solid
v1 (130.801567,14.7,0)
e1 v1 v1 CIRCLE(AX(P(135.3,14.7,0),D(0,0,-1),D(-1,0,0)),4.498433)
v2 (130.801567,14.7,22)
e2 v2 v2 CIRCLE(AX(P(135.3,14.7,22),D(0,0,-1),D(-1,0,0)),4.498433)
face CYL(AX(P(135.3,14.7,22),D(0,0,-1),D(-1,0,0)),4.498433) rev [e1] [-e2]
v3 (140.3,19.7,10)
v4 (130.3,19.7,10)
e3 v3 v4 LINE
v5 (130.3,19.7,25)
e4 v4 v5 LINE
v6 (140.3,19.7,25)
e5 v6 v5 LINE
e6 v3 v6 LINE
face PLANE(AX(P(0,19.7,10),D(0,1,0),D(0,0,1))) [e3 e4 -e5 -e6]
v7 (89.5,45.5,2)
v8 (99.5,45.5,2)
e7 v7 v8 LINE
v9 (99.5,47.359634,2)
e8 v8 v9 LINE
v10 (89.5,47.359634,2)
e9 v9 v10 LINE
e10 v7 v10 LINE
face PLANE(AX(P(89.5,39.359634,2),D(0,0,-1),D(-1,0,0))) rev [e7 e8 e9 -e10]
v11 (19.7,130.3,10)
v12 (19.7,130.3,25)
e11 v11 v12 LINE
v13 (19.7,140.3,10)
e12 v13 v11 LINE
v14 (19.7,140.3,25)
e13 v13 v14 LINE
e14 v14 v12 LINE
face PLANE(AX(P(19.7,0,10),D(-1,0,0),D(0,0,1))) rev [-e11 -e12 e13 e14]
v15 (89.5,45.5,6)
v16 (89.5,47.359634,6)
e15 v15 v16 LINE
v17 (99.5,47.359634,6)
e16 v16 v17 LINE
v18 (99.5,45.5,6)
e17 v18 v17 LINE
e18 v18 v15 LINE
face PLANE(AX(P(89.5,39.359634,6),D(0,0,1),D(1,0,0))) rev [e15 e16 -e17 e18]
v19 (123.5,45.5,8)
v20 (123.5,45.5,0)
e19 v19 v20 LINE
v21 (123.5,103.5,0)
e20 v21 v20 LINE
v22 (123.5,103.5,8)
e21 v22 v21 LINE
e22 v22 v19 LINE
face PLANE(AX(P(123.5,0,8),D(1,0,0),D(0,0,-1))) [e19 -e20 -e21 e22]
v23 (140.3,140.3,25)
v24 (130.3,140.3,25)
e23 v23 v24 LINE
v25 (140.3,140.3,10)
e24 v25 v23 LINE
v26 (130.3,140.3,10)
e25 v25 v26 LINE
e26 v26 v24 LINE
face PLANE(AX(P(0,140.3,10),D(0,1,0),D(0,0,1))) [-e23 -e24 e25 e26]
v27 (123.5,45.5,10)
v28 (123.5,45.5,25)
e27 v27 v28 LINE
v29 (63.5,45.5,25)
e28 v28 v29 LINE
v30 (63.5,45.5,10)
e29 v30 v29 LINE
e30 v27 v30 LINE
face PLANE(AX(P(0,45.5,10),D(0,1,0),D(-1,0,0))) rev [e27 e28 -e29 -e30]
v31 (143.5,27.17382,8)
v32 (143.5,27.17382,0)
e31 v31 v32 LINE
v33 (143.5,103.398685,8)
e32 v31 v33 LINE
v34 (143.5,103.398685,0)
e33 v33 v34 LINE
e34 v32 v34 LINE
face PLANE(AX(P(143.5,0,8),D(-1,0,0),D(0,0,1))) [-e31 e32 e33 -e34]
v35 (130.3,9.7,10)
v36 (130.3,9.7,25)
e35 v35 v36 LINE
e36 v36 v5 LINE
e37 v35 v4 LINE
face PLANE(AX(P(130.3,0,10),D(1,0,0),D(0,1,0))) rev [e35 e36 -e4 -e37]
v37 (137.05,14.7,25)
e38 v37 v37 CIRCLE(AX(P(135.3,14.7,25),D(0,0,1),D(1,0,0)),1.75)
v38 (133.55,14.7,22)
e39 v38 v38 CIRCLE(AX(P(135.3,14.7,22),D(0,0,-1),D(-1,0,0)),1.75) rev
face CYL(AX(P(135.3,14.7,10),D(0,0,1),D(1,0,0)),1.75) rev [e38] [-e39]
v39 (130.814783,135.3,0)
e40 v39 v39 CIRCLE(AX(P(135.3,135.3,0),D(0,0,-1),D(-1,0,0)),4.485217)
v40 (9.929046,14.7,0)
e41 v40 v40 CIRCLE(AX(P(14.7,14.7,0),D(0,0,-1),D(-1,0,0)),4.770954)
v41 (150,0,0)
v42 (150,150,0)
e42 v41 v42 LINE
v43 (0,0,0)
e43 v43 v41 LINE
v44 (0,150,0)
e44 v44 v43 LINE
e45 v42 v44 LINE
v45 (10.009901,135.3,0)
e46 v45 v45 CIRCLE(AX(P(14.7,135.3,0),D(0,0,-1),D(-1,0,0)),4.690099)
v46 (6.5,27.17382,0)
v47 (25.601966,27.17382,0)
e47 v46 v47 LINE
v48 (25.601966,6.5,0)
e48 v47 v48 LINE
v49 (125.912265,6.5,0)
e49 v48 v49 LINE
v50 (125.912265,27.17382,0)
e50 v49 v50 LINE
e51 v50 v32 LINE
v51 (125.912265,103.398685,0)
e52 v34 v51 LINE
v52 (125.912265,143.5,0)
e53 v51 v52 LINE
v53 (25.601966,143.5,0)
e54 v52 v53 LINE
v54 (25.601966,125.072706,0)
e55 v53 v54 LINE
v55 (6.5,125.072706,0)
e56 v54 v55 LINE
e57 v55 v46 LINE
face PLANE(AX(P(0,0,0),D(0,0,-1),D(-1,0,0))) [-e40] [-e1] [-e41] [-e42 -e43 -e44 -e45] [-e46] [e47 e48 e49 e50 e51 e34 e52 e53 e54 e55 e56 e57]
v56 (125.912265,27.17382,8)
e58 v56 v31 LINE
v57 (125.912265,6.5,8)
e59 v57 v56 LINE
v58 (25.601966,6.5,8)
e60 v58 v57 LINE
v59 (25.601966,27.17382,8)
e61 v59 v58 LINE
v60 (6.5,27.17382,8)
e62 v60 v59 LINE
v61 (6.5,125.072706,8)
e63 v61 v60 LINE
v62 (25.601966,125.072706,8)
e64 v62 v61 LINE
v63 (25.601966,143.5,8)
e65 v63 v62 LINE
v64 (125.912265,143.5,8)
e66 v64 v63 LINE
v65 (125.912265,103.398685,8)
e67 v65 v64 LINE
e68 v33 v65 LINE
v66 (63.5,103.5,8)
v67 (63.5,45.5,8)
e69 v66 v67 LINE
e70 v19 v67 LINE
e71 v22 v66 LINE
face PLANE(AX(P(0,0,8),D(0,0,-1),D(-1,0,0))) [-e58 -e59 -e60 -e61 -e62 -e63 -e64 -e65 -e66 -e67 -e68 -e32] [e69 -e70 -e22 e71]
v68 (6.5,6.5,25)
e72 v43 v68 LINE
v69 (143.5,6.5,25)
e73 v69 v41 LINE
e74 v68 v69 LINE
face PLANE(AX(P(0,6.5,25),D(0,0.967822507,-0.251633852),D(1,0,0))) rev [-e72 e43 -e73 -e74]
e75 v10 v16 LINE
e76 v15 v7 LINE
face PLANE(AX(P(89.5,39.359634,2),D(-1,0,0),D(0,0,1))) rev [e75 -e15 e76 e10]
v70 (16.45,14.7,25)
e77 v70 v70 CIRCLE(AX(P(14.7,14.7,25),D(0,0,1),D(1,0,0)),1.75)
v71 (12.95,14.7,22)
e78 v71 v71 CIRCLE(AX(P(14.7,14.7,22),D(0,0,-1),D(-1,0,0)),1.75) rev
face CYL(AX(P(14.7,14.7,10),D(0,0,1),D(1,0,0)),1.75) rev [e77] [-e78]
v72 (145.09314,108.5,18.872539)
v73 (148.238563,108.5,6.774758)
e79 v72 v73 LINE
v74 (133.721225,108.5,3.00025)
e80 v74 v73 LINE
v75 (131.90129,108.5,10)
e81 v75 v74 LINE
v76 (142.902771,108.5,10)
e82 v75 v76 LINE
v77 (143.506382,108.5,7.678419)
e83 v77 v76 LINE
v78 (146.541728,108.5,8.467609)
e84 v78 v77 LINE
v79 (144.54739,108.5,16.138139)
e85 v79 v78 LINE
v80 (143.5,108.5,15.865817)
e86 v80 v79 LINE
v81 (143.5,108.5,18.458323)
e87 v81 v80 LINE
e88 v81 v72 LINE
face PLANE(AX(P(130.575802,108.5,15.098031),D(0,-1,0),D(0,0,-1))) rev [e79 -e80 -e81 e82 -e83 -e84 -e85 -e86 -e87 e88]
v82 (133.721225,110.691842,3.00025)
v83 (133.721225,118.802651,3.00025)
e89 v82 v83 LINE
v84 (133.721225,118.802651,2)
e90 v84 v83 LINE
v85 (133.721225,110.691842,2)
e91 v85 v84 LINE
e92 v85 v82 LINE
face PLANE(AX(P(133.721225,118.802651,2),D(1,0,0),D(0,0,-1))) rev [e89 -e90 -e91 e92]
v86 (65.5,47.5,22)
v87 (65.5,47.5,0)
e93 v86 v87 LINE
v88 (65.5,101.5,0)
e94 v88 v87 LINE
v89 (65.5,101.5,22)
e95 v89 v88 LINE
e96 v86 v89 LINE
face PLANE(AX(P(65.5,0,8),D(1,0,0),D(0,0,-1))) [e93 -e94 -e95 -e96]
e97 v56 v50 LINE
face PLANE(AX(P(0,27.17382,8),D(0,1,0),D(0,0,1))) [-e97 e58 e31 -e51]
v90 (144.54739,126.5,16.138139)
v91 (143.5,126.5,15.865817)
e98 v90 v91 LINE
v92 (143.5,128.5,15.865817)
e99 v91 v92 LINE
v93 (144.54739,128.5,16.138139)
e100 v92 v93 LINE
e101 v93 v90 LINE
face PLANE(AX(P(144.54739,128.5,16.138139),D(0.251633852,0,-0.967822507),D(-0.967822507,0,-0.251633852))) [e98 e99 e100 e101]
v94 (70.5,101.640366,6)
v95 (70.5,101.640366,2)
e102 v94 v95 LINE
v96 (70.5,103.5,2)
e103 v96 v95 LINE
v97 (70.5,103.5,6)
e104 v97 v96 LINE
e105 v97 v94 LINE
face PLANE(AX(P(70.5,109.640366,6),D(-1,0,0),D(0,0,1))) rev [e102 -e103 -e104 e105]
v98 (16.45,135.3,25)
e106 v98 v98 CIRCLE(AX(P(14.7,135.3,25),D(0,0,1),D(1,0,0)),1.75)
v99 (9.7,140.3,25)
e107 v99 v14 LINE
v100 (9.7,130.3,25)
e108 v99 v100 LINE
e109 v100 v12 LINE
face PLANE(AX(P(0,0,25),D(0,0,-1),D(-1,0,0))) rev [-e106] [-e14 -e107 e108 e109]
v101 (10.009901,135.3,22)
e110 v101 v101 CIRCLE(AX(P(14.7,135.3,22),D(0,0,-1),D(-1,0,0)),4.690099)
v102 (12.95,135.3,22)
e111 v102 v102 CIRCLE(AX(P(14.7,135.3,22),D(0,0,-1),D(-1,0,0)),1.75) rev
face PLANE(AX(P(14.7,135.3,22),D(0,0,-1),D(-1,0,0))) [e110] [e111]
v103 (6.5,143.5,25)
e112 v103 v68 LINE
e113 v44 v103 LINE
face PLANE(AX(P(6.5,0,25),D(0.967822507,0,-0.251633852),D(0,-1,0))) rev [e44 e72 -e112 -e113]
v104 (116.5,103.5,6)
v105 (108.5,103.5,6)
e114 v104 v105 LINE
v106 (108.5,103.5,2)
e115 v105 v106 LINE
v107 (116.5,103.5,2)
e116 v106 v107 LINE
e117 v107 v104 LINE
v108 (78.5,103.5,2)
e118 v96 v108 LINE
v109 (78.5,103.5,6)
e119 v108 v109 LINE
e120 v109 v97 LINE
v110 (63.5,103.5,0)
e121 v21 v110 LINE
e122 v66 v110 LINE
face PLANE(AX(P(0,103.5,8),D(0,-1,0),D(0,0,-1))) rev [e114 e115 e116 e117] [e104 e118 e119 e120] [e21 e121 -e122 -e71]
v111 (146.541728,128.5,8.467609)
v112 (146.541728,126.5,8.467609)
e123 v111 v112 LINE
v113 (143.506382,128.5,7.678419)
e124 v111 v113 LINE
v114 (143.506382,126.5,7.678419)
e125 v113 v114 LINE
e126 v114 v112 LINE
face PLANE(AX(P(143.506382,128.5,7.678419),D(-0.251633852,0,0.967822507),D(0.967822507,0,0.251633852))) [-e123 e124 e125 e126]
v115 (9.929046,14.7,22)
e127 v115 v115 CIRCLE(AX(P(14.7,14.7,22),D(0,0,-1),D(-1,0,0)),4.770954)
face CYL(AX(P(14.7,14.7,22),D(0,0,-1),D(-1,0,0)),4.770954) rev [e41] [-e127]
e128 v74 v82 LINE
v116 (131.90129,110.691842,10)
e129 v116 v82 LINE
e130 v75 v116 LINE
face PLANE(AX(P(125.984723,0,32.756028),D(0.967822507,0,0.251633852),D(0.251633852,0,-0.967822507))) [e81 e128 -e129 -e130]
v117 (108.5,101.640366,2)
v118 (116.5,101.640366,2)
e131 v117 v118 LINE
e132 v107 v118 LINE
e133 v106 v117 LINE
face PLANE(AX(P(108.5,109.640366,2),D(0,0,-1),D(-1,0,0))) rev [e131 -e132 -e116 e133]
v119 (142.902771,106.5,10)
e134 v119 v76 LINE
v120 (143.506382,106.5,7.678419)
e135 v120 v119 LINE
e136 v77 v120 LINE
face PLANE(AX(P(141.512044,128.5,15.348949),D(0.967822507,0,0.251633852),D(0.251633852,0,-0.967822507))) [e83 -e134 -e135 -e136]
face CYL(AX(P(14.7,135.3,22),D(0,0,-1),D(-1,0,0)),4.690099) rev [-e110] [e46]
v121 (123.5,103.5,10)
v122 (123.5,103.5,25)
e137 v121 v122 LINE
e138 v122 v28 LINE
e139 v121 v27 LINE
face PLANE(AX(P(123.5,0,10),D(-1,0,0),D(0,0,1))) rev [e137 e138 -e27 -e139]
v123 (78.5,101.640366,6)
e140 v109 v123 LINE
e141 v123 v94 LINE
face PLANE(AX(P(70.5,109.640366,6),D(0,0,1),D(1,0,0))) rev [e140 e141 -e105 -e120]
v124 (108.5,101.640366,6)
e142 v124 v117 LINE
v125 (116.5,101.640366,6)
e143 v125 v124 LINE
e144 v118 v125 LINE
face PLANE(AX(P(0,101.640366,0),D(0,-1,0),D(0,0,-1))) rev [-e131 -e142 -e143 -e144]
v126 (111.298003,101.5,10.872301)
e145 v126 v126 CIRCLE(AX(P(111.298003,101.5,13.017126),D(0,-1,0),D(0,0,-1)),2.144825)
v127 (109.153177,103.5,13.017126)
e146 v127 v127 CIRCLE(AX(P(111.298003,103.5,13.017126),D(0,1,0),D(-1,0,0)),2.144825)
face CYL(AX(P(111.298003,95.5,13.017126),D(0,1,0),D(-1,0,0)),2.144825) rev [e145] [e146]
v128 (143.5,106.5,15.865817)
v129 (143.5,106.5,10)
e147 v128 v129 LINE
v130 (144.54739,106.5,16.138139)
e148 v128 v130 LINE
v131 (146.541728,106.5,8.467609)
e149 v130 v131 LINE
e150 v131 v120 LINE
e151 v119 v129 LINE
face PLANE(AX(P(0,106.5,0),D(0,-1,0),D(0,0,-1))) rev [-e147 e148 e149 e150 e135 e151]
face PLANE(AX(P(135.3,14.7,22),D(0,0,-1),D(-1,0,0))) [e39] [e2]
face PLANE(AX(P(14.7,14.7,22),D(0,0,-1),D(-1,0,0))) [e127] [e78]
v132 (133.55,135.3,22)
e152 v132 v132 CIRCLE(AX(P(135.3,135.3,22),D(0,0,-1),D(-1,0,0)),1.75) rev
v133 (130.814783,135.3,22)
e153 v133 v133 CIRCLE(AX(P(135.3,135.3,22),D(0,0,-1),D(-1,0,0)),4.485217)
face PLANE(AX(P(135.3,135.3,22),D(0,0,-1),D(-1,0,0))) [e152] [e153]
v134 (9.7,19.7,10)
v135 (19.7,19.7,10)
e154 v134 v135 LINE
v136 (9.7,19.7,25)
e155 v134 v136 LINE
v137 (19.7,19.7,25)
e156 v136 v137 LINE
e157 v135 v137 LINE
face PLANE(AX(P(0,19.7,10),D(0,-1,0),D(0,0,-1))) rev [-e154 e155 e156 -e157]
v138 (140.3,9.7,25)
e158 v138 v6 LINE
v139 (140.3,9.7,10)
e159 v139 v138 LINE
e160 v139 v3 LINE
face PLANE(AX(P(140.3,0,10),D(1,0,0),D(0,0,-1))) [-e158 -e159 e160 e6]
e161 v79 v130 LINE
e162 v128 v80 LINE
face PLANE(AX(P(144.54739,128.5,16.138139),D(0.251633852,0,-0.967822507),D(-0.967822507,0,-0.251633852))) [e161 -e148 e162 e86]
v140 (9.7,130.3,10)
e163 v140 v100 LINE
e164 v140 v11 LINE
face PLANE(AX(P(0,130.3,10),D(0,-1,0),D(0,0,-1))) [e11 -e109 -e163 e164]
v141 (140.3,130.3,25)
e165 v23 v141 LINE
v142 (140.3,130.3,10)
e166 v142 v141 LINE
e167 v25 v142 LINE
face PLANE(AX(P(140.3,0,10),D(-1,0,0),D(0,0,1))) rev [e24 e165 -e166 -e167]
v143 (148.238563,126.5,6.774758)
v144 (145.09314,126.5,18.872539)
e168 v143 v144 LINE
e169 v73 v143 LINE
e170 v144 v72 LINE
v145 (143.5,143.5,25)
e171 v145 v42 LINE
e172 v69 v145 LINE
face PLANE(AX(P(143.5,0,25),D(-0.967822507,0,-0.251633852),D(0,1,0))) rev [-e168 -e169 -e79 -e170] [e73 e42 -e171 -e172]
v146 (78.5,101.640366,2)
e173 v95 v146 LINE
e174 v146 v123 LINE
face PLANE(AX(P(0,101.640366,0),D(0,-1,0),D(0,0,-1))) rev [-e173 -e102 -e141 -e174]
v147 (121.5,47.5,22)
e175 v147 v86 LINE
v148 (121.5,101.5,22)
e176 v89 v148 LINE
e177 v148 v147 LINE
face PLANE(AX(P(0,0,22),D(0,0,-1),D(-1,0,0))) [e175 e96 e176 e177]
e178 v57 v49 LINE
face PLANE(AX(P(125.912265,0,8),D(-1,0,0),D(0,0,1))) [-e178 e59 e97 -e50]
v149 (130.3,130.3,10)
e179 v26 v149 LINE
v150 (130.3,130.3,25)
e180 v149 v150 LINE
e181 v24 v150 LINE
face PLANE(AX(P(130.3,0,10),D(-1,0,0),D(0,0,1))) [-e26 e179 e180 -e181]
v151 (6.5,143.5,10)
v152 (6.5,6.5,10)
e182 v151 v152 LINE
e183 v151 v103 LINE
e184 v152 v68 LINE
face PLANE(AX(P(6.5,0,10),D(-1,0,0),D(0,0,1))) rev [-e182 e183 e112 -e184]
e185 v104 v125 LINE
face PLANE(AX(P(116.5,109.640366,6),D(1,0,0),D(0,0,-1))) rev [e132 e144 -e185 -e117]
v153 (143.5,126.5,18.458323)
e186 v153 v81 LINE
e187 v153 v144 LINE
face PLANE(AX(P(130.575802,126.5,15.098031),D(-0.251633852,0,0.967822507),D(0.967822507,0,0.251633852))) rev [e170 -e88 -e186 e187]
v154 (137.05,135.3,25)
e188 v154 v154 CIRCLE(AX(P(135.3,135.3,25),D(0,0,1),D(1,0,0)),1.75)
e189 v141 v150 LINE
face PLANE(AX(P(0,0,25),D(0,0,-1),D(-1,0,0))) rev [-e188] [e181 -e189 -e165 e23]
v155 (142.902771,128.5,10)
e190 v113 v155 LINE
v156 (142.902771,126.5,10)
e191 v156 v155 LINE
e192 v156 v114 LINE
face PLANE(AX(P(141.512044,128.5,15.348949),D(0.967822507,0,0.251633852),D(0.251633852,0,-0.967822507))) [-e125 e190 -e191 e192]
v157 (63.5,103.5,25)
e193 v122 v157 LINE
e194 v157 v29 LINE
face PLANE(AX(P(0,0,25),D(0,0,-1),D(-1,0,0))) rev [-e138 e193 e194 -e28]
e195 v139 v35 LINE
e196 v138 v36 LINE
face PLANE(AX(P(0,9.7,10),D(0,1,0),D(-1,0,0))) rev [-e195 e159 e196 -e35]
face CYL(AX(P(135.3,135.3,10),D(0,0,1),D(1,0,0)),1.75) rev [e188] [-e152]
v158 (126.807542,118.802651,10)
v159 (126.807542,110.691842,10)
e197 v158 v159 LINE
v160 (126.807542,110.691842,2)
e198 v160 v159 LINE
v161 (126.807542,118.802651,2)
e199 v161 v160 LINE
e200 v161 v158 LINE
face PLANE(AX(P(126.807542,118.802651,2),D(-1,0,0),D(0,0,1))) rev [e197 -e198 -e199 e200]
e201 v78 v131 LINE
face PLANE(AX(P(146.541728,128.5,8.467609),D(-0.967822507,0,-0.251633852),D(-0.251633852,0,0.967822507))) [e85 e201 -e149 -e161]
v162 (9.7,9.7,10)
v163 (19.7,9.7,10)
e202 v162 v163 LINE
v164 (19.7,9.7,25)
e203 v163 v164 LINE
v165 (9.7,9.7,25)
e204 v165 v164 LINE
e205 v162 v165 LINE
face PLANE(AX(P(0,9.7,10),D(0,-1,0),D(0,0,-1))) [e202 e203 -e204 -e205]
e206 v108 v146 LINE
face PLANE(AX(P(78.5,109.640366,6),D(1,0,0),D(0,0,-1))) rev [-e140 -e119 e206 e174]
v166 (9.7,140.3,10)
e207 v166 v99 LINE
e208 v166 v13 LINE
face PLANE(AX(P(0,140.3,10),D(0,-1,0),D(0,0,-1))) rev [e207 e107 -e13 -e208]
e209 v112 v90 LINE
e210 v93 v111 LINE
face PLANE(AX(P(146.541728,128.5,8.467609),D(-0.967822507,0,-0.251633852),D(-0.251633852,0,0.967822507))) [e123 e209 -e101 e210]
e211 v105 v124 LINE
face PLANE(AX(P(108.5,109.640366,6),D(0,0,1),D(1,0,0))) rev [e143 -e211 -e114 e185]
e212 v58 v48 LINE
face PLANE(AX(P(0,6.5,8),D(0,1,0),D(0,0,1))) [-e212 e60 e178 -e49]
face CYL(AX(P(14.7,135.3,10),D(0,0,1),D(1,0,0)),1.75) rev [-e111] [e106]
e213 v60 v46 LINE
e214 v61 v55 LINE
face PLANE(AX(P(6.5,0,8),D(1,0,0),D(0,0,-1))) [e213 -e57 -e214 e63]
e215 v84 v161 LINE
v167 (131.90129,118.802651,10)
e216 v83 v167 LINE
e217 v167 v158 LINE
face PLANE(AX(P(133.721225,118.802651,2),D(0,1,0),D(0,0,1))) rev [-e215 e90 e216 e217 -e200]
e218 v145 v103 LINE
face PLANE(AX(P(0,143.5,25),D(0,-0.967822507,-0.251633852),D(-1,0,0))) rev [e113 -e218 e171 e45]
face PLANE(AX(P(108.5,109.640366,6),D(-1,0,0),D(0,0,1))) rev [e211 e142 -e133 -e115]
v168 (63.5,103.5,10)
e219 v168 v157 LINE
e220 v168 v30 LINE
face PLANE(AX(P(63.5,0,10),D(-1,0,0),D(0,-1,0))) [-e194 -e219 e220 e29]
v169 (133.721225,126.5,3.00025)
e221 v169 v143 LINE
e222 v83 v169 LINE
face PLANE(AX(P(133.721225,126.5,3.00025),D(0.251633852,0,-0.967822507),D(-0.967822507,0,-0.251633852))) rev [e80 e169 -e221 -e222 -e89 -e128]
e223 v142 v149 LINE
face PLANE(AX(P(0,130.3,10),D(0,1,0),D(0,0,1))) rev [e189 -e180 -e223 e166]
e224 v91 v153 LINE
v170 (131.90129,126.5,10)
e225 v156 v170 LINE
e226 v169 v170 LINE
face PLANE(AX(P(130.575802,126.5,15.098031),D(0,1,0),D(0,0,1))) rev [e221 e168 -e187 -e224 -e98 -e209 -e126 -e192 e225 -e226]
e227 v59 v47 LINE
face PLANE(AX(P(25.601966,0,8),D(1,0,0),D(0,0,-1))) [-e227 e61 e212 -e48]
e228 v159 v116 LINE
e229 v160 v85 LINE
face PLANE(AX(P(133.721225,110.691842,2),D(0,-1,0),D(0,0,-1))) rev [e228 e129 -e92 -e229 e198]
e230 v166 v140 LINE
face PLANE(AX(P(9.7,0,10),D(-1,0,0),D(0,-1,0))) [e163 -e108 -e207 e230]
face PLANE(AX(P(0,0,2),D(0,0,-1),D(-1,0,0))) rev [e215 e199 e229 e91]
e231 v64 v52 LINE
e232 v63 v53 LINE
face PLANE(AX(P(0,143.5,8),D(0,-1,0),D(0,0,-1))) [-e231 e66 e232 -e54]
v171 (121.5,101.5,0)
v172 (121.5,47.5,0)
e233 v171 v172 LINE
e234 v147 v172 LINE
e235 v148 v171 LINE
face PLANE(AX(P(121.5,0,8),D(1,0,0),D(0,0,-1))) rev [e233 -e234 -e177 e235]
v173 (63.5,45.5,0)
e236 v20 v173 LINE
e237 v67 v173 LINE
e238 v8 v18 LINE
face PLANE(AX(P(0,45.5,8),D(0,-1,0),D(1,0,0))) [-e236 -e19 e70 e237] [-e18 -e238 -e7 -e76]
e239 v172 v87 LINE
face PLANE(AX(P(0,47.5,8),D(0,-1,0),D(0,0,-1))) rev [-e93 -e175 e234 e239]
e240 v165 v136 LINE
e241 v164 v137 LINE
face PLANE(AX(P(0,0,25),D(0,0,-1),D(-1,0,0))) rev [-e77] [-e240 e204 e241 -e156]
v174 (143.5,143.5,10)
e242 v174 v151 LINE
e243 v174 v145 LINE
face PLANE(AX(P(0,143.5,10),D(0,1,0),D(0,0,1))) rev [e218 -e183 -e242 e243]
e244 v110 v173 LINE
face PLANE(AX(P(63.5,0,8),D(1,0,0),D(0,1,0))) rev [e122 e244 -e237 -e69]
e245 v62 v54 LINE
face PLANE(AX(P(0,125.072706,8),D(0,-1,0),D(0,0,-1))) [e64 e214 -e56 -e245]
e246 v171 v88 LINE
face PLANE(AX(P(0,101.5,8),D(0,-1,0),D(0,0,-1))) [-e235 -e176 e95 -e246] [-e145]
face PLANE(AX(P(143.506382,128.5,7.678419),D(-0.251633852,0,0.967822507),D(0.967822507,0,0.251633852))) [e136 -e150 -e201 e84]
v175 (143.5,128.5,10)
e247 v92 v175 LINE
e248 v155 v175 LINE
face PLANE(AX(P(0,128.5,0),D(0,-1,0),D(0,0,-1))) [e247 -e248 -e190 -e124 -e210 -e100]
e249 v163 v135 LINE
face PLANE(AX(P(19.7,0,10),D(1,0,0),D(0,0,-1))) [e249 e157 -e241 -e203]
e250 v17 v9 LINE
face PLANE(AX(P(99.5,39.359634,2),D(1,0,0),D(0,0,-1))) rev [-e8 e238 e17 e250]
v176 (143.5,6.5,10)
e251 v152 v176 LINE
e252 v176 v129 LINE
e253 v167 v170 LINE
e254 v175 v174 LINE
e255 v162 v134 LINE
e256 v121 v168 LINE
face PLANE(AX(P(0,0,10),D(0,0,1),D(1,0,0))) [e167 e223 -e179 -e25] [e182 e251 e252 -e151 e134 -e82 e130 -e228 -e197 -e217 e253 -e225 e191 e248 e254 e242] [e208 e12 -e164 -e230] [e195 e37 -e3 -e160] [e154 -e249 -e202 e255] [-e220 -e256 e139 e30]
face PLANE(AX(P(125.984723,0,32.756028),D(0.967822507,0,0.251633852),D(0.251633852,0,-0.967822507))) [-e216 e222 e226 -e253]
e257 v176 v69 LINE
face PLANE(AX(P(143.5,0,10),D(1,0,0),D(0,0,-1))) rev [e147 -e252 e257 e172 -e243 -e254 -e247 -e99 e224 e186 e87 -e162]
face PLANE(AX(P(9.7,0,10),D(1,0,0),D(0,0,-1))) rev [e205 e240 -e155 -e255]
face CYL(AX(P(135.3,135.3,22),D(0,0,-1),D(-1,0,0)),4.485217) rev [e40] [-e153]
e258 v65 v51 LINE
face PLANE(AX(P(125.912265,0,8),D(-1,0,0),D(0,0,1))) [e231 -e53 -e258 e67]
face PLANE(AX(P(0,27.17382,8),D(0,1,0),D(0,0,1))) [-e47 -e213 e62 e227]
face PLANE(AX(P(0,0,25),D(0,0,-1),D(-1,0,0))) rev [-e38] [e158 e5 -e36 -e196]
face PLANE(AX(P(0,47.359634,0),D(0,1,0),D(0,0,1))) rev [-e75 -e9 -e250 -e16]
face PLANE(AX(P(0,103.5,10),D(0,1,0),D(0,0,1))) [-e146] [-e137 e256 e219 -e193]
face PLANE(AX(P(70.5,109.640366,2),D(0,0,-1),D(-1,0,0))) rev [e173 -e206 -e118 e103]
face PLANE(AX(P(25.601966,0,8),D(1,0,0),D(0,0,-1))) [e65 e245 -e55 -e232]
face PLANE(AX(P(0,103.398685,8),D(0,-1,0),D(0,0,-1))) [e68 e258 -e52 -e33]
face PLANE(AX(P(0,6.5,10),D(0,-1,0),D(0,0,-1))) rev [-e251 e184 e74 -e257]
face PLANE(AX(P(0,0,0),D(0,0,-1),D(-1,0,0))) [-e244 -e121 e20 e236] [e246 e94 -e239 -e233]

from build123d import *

# Parameters (mm, degrees)
ESQUISSE1_W                  = 150
ESQUISSE1_H                  = 150
BOSS_EXTRU_1_DEPTH           = 25
CHANFREIN1_SIZE              = 25
CHANFREIN1_SIZE_2            = 6.5
ESQUISSE2_W                  = 137
ESQUISSE2_H                  = 137
ESQUISSE2_W_2                = 10
ESQUISSE2_H_2                = 10
ESQUISSE2_W_3                = 60
ESQUISSE2_H_3                = 58
ESQUISSE2_R                  = 1.75
ENL_V_MAT_EXTRU_2_DEPTH      = 15
ESQUISSE3_W                  = 12.5
ESQUISSE3_H                  = 18
ENL_V_MAT_EXTRU_3_DEPTH      = 15
ENL_V_MAT_EXTRU_4_DEPTH      = 20
ENL_V_MAT_EXTRU_4_DEPTH_BACK = 2
ESQUISSE5_W                  = 60
ESQUISSE5_H                  = 58
ESQUISSE5_W_2                = 56
ESQUISSE5_H_2                = 54
ENL_V_MAT_EXTRU_7_DEPTH      = 8
ESQUISSE6_W                  = 56
ESQUISSE6_H                  = 54
ENL_V_MAT_EXTRU_6_DEPTH      = 22
ESQUISSE7_W                  = 8
ESQUISSE7_H                  = 4
ENL_V_MAT_EXTRU_13_DEPTH     = 8
ESQUISSE8_R                  = 2.14482531
ENL_V_MAT_EXTRU_9_DEPTH      = 8
ESQUISSE9_R                  = 4.485216979
ESQUISSE9_R_2                = 4.690098516
ESQUISSE9_R_3                = 4.770954249
ESQUISSE9_R_4                = 4.498432912
ENL_V_MAT_EXTRU_10_DEPTH     = 22
ESQUISSE10_W                 = 6.913683137
ESQUISSE10_H                 = 8.110809872
ENL_V_MAT_EXTRU_11_DEPTH     = 8
ESQUISSE11_W                 = 10
ESQUISSE11_H                 = 4
ENL_V_MAT_EXTRU_12_DEPTH     = 8


with BuildPart() as part:
    # Esquisse1 → Boss.-Extru.1 (new body)
    with BuildSketch(Plane.XY):
        with Locations((75, 75)):
            Rectangle(ESQUISSE1_W, ESQUISSE1_H)
    extrude(amount=BOSS_EXTRU_1_DEPTH)

    # Chanfrein1
    # the kernel refuses this chamfer: 25, 6.5 mm, written as the material it takes off along each edge
    with BuildSketch(Plane(origin=(150, -64.922604179, 25), x_dir=(0.00968976271621493, 0, -0.9999530531472482), z_dir=(0, 1, 0)), Plane(origin=(214.922604179, 150, 25), x_dir=(0, 0.00968976271621493, -0.9999530531472482), z_dir=(-1, 0, 0)), Plane(origin=(0, 214.922604179, 25), x_dir=(-0.009689762716214955, 0, -0.9999530531472482), z_dir=(0, -1, 0)), Plane(origin=(-64.922604179, 0, 25), x_dir=(0, -0.009689762716214955, -0.9999530531472482), z_dir=(1, 0, 0))) as chanfrein1_piece_1:
        Polygon((CHANFREIN1_SIZE * 0.999953053147, CHANFREIN1_SIZE * 0.00968976271621), (-CHANFREIN1_SIZE_2 * 0.00968976271621, CHANFREIN1_SIZE_2 * 0.999953053147), (0, 0), align=None)
    extrude(amount=279.845208358, mode=Mode.SUBTRACT)

    # Esquisse2 → Enlèv. mat.-Extru.2 (cut)
    # profile 1 of 5: a face of its own
    with BuildSketch(Plane.XY.offset(25)):
        with Locations((75, 75)):
            Rectangle(ESQUISSE2_W, ESQUISSE2_H)
        with Locations((14.7, 14.7)):
            Rectangle(ESQUISSE2_W_2, ESQUISSE2_H_2, mode=Mode.SUBTRACT)
        with Locations((135.3, 14.7)):
            Rectangle(ESQUISSE2_W_2, ESQUISSE2_H_2, mode=Mode.SUBTRACT)
        with Locations((93.5, 74.5)):
            Rectangle(ESQUISSE2_W_3, ESQUISSE2_H_3, mode=Mode.SUBTRACT)
        with Locations((14.7, 135.3)):
            Rectangle(ESQUISSE2_W_2, ESQUISSE2_H_2, mode=Mode.SUBTRACT)
        with Locations((135.3, 135.3)):
            Rectangle(ESQUISSE2_W_2, ESQUISSE2_H_2, mode=Mode.SUBTRACT)
    # profile 2 of 5: a face of its own
    with BuildSketch(Plane.XY.offset(25)):
        with Locations((14.7, 135.3)):
            Circle(ESQUISSE2_R)
    # profile 3 of 5: a face of its own
    with BuildSketch(Plane.XY.offset(25)):
        with Locations((135.3, 135.3)):
            Circle(ESQUISSE2_R)
    # profile 4 of 5: a face of its own
    with BuildSketch(Plane.XY.offset(25)):
        with Locations((135.3, 14.7)):
            Circle(ESQUISSE2_R)
    # profile 5 of 5: a face of its own
    with BuildSketch(Plane.XY.offset(25)):
        with Locations((14.7, 14.7)):
            Circle(ESQUISSE2_R)
    extrude(amount=-ENL_V_MAT_EXTRU_2_DEPTH, mode=Mode.SUBTRACT)

    # Esquisse3 → Enlèv. mat.-Extru.3 (cut)
    with BuildSketch(Plane(origin=(140.502060697, 0, 36.530535781), x_dir=(0.2516338517649486, 0, -0.9678225067882726), z_dir=(0.9678225067882725, 0, 0.25163385176494857))):
        with Locations((24.495077765, 117.5)):
            Rectangle(ESQUISSE3_W, ESQUISSE3_H)
    extrude(amount=-ENL_V_MAT_EXTRU_3_DEPTH, mode=Mode.SUBTRACT)

    # Esquisse4 → Enlèv. mat.-Extru.4 (cut, two sides: drawn at the far end of the back side and taken through both)
    with BuildSketch(Plane(origin=(0, 108.5, 0), x_dir=(1, 0, 0), z_dir=(0, 1, 0)).offset(-ENL_V_MAT_EXTRU_4_DEPTH_BACK)):
        Polygon((146.541727915, -8.467609261), (144.547390296, -16.138138565), (141.512044488, -15.348948655), (143.506382107, -7.678419351), align=None)
    extrude(amount=ENL_V_MAT_EXTRU_4_DEPTH + ENL_V_MAT_EXTRU_4_DEPTH_BACK, mode=Mode.SUBTRACT)

    # Esquisse5 → Enlèv. mat.-Extru.7 (cut)
    # profile 1 of 2: a face of its own
    with BuildSketch(Plane(origin=(0, 0, 0), x_dir=(-1, 0, 0), z_dir=(0, 0, -1))):
        Polygon((-125.912264941, 103.398684795), (-125.912264941, 143.5), (-25.60196638, 143.5), (-25.60196638, 125.072705698), (-6.5, 125.072705698), (-6.5, 27.173820188), (-25.60196638, 27.173820188), (-25.60196638, 6.5), (-125.912264941, 6.5), (-125.912264941, 27.173820188), (-143.5, 27.173820188), (-143.5, 103.398684795), align=None)
        with Locations((-93.5, 74.5)):
            Rectangle(ESQUISSE5_W, ESQUISSE5_H, mode=Mode.SUBTRACT)
    # profile 2 of 2: a face of its own
    with BuildSketch(Plane(origin=(0, 0, 0), x_dir=(-1, 0, 0), z_dir=(0, 0, -1))):
        with Locations((-93.5, 74.5)):
            Rectangle(ESQUISSE5_W_2, ESQUISSE5_H_2)
    extrude(amount=-ENL_V_MAT_EXTRU_7_DEPTH, mode=Mode.SUBTRACT)

    # Esquisse6 → Enlèv. mat.-Extru.6 (cut)
    with BuildSketch(Plane(origin=(0, 0, 0), x_dir=(-1, 0, 0), z_dir=(0, 0, -1))):
        with Locations((-93.5, 74.5)):
            Rectangle(ESQUISSE6_W, ESQUISSE6_H)
    extrude(amount=-ENL_V_MAT_EXTRU_6_DEPTH, mode=Mode.SUBTRACT)

    # Esquisse7 → Enlèv. mat.-Extru.13 (cut)
    with BuildSketch(Plane.XZ.offset(-101.640366459)):
        with Locations((74.5, 4)):
            Rectangle(ESQUISSE7_W, ESQUISSE7_H)
        with Locations((112.5, 4)):
            Rectangle(ESQUISSE7_W, ESQUISSE7_H)
    extrude(amount=-ENL_V_MAT_EXTRU_13_DEPTH, mode=Mode.SUBTRACT)

    # Esquisse8 → Enlèv. mat.-Extru.9 (cut)
    with BuildSketch(Plane(origin=(0, 103.5, 0), x_dir=(1, 0, 0), z_dir=(0, 1, 0))):
        with Locations(Location((111.298002562, -13.017125877, 0), (0, 0, 180))):
            Circle(ESQUISSE8_R)
    extrude(amount=-ENL_V_MAT_EXTRU_9_DEPTH, mode=Mode.SUBTRACT)

    # Esquisse9 → Enlèv. mat.-Extru.10 (cut)
    with BuildSketch(Plane(origin=(0, 0, 0), x_dir=(-1, 0, 0), z_dir=(0, 0, -1))):
        with Locations((-135.3, 135.3)):
            Circle(ESQUISSE9_R)
        with Locations((-14.7, 135.3)):
            Circle(ESQUISSE9_R_2)
        with Locations((-14.7, 14.7)):
            Circle(ESQUISSE9_R_3)
        with Locations((-135.3, 14.7)):
            Circle(ESQUISSE9_R_4)
    extrude(amount=-ENL_V_MAT_EXTRU_10_DEPTH, mode=Mode.SUBTRACT)

    # Esquisse10 → Enlèv. mat.-Extru.11 (cut)
    with BuildSketch(Plane.XY.offset(10)):
        with Locations((130.264383867, 114.747246467)):
            Rectangle(ESQUISSE10_W, ESQUISSE10_H)
    extrude(amount=-ENL_V_MAT_EXTRU_11_DEPTH, mode=Mode.SUBTRACT)

    # Esquisse11 → Enlèv. mat.-Extru.12 (cut)
    with BuildSketch(Plane(origin=(0, 47.359633541, 0), x_dir=(1, 0, 0), z_dir=(0, 1, 0))):
        with Locations((94.5, -4)):
            Rectangle(ESQUISSE11_W, ESQUISSE11_H)
    extrude(amount=-ENL_V_MAT_EXTRU_12_DEPTH, mode=Mode.SUBTRACT)


solid = part.part
